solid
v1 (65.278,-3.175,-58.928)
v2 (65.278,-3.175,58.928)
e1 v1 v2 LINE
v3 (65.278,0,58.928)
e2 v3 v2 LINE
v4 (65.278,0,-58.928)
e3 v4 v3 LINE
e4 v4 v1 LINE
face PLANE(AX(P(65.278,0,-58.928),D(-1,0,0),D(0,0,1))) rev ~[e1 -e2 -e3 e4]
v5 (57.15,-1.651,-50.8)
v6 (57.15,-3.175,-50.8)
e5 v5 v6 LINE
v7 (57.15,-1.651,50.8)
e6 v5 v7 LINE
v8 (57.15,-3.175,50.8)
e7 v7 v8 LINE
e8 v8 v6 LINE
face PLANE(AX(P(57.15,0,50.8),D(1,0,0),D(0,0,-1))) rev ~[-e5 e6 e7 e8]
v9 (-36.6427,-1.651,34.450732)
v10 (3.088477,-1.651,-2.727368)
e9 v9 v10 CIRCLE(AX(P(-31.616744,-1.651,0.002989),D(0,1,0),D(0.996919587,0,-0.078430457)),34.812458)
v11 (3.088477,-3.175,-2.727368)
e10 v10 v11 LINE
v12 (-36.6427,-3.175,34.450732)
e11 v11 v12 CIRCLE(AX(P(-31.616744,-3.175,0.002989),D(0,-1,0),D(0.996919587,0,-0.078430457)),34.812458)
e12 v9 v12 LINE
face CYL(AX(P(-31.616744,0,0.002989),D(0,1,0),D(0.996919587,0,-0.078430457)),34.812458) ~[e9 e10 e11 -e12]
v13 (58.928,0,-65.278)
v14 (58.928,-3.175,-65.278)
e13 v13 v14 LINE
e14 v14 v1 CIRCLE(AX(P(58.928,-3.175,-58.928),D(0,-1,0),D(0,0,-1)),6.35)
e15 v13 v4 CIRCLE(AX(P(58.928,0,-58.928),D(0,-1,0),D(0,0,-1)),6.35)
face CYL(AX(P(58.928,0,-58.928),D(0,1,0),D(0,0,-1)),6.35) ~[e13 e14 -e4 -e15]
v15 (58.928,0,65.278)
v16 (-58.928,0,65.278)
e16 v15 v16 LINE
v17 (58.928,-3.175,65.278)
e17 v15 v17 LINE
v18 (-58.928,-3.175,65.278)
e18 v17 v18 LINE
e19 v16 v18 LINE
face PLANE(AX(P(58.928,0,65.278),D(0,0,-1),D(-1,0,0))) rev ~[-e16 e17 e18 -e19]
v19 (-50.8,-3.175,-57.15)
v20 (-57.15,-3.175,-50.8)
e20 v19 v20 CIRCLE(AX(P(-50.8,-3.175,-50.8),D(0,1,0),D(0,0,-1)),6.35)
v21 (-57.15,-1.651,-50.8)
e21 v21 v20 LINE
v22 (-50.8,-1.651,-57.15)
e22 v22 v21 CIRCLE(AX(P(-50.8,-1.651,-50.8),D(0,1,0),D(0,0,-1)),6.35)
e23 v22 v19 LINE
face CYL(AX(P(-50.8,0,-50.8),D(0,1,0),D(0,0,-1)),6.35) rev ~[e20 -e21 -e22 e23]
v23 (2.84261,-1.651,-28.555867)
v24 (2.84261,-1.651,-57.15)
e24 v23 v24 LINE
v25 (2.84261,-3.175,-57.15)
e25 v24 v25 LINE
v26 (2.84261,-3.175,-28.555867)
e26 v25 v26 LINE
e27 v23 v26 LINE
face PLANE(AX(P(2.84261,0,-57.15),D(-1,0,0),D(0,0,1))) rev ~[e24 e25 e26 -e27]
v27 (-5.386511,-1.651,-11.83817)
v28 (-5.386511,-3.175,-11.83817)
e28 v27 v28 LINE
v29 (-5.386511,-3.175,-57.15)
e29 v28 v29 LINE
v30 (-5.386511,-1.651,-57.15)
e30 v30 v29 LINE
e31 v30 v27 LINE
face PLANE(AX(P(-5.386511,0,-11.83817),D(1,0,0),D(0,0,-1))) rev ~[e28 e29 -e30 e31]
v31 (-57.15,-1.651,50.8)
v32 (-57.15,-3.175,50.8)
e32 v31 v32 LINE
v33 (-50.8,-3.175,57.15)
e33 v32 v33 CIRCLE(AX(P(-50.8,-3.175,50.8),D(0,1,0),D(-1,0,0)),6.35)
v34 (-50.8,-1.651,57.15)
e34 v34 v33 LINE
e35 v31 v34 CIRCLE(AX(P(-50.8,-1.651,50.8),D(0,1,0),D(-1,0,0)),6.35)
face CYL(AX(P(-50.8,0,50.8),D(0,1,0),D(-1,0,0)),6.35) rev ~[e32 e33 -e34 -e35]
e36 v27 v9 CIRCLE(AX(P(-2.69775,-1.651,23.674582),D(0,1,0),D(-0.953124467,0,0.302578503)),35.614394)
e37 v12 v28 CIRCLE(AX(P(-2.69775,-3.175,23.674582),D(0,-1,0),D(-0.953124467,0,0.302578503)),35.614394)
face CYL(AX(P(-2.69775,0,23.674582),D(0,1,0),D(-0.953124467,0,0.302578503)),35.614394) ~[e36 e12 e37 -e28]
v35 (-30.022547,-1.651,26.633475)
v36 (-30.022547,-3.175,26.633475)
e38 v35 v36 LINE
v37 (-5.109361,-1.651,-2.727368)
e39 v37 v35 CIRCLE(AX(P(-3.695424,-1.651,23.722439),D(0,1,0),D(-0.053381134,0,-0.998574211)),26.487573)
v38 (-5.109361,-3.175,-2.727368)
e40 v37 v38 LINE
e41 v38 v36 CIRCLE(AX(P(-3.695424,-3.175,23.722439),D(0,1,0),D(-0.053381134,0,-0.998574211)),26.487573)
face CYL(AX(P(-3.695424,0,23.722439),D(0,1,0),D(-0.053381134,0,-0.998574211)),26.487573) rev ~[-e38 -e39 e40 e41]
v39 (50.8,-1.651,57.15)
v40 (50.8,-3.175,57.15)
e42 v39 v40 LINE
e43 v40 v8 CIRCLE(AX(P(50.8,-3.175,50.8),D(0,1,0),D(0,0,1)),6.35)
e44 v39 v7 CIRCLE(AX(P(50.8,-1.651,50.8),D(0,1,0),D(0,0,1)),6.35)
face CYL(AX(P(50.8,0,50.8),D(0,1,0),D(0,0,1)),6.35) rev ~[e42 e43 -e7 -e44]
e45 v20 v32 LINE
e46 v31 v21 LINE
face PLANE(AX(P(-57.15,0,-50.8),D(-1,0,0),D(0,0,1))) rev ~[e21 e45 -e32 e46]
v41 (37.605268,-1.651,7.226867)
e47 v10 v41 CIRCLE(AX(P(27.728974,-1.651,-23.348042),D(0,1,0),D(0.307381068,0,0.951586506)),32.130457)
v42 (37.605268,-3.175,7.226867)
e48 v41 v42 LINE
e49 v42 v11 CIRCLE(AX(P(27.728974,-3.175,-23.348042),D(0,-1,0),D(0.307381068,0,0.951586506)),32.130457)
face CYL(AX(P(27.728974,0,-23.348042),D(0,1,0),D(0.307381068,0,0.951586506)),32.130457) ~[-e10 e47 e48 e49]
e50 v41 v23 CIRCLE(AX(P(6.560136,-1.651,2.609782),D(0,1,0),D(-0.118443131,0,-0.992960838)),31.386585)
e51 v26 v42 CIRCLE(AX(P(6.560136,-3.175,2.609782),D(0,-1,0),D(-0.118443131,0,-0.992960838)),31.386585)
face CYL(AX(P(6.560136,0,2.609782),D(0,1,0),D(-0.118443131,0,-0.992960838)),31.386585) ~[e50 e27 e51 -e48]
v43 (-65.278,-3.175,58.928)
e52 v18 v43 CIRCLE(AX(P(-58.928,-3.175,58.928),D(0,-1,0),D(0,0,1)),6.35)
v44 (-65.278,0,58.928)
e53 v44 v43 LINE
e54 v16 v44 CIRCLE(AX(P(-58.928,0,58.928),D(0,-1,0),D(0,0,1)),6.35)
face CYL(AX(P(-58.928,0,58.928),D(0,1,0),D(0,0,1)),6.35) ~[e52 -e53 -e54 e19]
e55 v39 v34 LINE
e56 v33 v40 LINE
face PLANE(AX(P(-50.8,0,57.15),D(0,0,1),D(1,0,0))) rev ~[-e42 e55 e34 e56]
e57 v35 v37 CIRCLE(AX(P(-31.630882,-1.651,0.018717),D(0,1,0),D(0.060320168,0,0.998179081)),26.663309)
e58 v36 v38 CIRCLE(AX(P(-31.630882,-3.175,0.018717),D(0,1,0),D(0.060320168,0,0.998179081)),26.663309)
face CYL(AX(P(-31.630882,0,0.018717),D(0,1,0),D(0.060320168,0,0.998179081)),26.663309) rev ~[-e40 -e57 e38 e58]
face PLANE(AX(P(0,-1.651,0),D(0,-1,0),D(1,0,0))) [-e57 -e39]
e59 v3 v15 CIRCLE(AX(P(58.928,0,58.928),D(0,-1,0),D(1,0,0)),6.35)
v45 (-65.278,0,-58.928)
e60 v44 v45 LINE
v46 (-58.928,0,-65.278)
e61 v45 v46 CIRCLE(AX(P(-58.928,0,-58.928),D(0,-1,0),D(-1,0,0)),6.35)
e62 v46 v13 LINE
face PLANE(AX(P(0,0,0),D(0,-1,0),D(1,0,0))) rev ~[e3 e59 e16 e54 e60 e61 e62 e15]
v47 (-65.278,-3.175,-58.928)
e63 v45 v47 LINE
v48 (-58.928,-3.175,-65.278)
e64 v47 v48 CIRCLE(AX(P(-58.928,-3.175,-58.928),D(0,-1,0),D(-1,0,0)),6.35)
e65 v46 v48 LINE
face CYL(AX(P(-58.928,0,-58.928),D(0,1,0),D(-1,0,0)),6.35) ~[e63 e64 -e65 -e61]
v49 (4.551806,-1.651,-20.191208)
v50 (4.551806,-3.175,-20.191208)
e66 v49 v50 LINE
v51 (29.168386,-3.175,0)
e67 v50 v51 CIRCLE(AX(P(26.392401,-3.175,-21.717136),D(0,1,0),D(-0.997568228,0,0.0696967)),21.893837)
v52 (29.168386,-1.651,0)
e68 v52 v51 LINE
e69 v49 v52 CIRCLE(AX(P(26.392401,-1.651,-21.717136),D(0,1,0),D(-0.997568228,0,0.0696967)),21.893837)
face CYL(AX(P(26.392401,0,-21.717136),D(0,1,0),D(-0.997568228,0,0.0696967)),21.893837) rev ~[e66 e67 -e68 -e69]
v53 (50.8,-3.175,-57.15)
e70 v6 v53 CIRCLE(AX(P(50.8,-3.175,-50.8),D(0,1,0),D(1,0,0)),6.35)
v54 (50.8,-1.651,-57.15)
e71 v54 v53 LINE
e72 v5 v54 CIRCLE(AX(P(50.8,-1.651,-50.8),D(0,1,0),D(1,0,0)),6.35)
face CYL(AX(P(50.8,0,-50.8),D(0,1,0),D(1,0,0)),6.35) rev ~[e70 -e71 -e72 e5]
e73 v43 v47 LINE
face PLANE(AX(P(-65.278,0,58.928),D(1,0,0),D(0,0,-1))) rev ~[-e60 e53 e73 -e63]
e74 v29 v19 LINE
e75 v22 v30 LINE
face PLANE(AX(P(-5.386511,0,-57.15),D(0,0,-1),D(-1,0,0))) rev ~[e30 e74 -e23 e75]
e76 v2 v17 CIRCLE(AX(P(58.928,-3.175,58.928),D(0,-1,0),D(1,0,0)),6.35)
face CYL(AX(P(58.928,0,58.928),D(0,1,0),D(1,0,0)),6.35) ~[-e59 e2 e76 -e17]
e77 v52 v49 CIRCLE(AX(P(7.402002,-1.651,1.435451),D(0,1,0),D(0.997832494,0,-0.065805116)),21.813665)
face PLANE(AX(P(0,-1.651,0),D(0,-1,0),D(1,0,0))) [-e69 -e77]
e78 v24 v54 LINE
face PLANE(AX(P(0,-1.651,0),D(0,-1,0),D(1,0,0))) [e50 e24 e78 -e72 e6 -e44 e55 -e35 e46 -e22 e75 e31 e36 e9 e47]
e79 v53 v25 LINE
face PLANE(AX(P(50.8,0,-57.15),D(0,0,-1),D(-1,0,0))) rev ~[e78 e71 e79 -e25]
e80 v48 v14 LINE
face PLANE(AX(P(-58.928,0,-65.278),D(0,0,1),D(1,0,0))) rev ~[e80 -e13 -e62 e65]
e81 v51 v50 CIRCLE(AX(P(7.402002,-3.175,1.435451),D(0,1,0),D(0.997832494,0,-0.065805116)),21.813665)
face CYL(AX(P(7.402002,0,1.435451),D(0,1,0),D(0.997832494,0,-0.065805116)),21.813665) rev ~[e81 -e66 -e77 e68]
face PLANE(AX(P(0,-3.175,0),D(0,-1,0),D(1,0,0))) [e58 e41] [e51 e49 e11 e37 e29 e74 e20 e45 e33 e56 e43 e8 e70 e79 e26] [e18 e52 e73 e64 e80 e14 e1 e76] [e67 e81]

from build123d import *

# Parameters (mm, degrees)
F2_DEPTH = 1.651
F3_DEPTH = 3.175


# Not quite as in the source:
# - a feature of the source that left no trace in its solid (it failed there, or was rolled back) is left out


with BuildPart() as f2:
    # F0 (on Front) → F2 (new body)
    with BuildSketch(Plane.XZ):
        with BuildLine():
            Line((57.15, 63.5), (-57.15, 63.5))
            ThreePointArc((-57.15, 63.5), (-61.6401280605, 61.6401280605), (-63.5, 57.15))
            Line((-63.5, 57.15), (-63.5, -57.15))
            ThreePointArc((-63.5, -57.15), (-61.6401280605, -61.6401280605), (-57.15, -63.5))
            Line((-57.15, -63.5), (57.15, -63.5))
            ThreePointArc((57.15, -63.5), (61.6401280605, -61.6401280605), (63.5, -57.15))
            Line((63.5, -57.15), (63.5, 57.15))
            ThreePointArc((63.5, 57.15), (61.6401280605, 61.6401280605), (57.15, 63.5))
        make_face()
    extrude(amount=F2_DEPTH)

    # F1 (on face) → F3 (join)
    with BuildSketch(Plane.XZ):
        with BuildLine():
            Line((58.928, 65.278), (-58.928, 65.278))
            ThreePointArc((-58.928, 65.278), (-63.4181280605, 63.4181280605), (-65.278, 58.928))
            Line((-65.278, 58.928), (-65.278, -58.928))
            ThreePointArc((-65.278, -58.928), (-63.4181280605, -63.4181280605), (-58.928, -65.278))
            Line((-58.928, -65.278), (58.928, -65.278))
            ThreePointArc((58.928, -65.278), (63.4181280605, -63.4181280605), (65.278, -58.928))
            Line((65.278, -58.928), (65.278, 58.928))
            ThreePointArc((65.278, 58.928), (63.4181280605, 63.4181280605), (58.928, 65.278))
        make_face()
        with BuildLine():
            ThreePointArc((29.1683860123, 0), (21.2359008795, -15.4304684341), (4.5518055526, -20.1912078303))
            ThreePointArc((4.5518055526, -20.1912078303), (12.5076591177, -4.7892295638), (29.1683860123, 0))
        make_face(mode=Mode.SUBTRACT)
        with BuildLine():
            ThreePointArc((-30.0225467432, 26.633475086), (-11.3001914874, 17.269662026), (-5.1093608776, -2.7273676961))
            ThreePointArc((-5.1093608776, -2.7273676961), (-23.8921161087, 6.5851949341), (-30.0225467432, 26.633475086))
        make_face(mode=Mode.SUBTRACT)
        with BuildLine():
            Line((-5.3865113296, -11.8381703437), (-5.3865113296, -57.15))
            Line((-5.3865113296, -57.15), (-50.8, -57.15))
            ThreePointArc((-50.8, -57.15), (-55.2901280605, -55.2901280605), (-57.15, -50.8))
            Line((-57.15, -50.8), (-57.15, 50.8))
            ThreePointArc((-57.15, 50.8), (-55.2901280605, 55.2901280605), (-50.8, 57.15))
            Line((-50.8, 57.15), (50.8, 57.15))
            ThreePointArc((50.8, 57.15), (55.2901280605, 55.2901280605), (57.15, 50.8))
            Line((57.15, 50.8), (57.15, -50.8))
            ThreePointArc((57.15, -50.8), (55.2901280605, -55.2901280605), (50.8, -57.15))
            Line((50.8, -57.15), (2.8426104691, -57.15))
            Line((2.8426104691, -57.15), (2.8426104691, -28.5558674872))
            ThreePointArc((2.8426104691, -28.5558674872), (29.0723668952, -19.260680993), (37.6052677218, 7.2268673576))
            ThreePointArc((37.6052677218, 7.2268673576), (18.8257654598, 7.524261984), (3.0884773301, -2.7273676961))
            ThreePointArc((3.0884773301, -2.7273676961), (-7.830876963, 25.422268659), (-36.6427004337, 34.4507321715))
            ThreePointArc((-36.6427004337, 34.4507321715), (-32.213387286, 3.7443986853), (-5.3865113296, -11.8381703437))
        make_face(mode=Mode.SUBTRACT)
    extrude(amount=F3_DEPTH)


solid = f2.part
